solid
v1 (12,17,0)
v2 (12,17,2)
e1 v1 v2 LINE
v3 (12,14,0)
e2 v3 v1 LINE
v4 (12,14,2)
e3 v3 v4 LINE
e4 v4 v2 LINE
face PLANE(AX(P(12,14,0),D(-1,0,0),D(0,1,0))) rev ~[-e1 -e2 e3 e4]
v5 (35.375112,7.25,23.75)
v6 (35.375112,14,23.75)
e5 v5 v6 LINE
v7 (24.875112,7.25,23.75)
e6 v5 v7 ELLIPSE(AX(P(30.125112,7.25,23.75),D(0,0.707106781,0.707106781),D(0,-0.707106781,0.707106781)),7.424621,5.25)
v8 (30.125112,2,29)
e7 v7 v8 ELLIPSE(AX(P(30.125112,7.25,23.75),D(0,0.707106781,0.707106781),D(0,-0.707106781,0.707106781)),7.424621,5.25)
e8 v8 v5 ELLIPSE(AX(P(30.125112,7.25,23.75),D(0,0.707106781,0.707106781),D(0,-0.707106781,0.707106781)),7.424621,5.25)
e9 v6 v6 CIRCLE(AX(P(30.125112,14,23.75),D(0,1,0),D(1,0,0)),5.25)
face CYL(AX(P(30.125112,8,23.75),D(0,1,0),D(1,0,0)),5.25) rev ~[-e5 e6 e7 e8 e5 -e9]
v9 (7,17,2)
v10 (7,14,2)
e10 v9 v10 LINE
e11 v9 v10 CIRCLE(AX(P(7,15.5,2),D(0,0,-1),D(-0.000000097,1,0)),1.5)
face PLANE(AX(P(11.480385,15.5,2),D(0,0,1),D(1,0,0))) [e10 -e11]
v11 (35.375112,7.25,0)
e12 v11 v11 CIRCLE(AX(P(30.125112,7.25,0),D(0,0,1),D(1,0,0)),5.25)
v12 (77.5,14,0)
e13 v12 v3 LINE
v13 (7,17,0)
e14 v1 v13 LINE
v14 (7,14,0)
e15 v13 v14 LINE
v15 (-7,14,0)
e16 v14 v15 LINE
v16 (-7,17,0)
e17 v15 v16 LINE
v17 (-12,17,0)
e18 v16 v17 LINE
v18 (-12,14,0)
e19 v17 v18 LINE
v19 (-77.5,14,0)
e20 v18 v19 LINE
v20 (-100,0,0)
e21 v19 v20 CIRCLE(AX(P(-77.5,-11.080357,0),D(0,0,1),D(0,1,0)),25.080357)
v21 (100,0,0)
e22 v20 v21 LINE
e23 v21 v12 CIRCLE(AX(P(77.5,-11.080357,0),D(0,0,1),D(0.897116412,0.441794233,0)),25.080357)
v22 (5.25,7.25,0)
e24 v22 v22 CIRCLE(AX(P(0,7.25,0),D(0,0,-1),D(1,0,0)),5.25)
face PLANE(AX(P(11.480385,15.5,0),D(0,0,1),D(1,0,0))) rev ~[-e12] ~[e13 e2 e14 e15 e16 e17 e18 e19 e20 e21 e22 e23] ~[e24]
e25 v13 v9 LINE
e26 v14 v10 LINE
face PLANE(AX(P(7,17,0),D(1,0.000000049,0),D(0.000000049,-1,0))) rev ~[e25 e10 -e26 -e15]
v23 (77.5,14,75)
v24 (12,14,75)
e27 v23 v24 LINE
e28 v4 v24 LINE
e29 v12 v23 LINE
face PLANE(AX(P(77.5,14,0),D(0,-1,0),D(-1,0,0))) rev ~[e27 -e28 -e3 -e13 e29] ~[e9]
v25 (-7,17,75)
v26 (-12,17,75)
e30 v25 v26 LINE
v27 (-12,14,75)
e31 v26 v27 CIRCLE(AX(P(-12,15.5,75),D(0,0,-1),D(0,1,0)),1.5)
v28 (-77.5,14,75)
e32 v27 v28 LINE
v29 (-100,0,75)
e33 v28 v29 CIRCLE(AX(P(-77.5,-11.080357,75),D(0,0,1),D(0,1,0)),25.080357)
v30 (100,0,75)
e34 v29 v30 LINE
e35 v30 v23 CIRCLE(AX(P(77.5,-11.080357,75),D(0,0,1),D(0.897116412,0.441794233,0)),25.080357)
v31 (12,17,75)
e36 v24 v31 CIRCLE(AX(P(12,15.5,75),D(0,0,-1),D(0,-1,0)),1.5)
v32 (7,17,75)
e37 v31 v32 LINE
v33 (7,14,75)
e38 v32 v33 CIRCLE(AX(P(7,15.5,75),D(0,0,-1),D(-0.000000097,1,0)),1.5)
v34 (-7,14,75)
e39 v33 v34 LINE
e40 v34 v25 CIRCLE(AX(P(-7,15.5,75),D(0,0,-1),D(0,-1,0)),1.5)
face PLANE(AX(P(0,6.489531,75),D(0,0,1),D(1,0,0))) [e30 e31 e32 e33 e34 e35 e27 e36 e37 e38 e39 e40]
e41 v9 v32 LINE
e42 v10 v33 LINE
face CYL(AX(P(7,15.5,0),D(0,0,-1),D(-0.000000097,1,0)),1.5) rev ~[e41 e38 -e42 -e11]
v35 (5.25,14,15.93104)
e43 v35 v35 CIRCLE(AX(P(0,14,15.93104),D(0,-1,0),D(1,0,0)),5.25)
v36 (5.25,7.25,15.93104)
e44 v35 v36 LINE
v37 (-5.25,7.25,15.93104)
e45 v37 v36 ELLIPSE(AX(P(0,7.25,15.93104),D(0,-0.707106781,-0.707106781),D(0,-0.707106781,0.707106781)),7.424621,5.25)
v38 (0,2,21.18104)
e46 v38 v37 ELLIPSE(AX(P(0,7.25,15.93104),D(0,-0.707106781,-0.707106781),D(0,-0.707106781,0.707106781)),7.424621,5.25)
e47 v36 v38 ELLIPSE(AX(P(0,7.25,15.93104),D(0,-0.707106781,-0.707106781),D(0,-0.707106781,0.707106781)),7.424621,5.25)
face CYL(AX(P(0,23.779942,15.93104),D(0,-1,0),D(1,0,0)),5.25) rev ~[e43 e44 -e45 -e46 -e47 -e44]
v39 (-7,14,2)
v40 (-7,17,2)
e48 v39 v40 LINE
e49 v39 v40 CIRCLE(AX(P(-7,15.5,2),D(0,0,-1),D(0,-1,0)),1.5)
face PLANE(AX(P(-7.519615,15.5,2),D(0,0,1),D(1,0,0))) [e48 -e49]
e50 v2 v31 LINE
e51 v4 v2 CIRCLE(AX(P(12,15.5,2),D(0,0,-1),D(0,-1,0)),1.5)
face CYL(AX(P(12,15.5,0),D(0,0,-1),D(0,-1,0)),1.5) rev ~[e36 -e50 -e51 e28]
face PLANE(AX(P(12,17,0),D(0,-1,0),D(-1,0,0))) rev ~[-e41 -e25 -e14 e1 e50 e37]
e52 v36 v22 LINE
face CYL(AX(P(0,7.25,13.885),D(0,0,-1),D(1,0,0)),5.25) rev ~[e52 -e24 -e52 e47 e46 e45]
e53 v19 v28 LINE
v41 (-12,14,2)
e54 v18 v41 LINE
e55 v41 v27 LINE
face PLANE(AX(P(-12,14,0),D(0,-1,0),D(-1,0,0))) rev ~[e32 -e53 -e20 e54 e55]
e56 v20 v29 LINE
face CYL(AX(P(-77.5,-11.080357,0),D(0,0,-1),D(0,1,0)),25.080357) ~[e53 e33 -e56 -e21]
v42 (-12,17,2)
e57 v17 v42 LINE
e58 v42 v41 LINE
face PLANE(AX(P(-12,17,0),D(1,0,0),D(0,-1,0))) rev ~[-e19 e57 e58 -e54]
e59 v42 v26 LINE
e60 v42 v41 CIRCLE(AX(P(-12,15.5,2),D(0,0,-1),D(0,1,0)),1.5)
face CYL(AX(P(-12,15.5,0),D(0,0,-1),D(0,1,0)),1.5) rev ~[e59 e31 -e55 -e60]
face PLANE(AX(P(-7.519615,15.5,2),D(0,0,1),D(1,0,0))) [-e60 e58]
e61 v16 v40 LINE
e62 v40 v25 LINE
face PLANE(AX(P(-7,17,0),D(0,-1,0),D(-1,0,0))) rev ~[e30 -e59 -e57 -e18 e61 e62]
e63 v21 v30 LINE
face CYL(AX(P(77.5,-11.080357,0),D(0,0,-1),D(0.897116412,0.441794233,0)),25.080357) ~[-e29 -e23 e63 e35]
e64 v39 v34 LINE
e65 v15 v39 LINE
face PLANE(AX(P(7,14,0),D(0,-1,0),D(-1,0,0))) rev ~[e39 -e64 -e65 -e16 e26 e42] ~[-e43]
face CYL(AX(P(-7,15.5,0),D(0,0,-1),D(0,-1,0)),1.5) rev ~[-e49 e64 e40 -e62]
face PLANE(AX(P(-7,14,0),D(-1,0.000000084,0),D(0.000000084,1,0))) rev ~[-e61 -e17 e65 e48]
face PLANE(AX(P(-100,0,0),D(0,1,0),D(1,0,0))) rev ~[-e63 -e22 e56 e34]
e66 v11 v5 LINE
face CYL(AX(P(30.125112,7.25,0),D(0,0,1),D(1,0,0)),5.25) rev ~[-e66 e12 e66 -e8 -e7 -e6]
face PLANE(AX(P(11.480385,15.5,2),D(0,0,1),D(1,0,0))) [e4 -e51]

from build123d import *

# Parameters (mm, degrees)
F0_R     = 5.25
F1_DEPTH = 75
F4_DEPTH = 2


# Not quite as in the source:
# - a feature names something its author has since deleted; it is built from what else it names


with BuildPart() as f1:
    # F0 (on Top) → F1 (new body)
    with BuildSketch(Plane.XY):
        with BuildLine():
            Line((-100, 0), (-13.8524602948, 0))
            Line((-13.8524602948, 0), (12.09906023, 0))
            Line((12.09906023, 0), (100, 0))
            ThreePointArc((100, 0), (90.75, 10.2142857143), (77.5, 14))
            Line((77.5, 14), (32.5911540906, 14))
            Line((32.5911540906, 14), (26.9999997473, 14))
            Line((26.9999997473, 14), (11.9999997473, 14))
            Line((11.9999997473, 14), (7, 14))
            Line((7, 14), (-7, 14))
            Line((-7, 14), (-11.9999997473, 14))
            Line((-11.9999997473, 14), (-77.5, 14))
            ThreePointArc((-77.5, 14), (-90.75, 10.2142857143), (-100, 0))
        make_face()
        with Locations((0, 7.25)):
            Circle(F0_R, mode=Mode.SUBTRACT)
        with Locations((30.1251118069, 7.25)):
            Circle(F0_R, mode=Mode.SUBTRACT)
        with Locations((30.1251118069, 7.25)):
            Circle(F0_R)
        with BuildLine():
            ThreePointArc((-11.9999997473, 17), (-10.4999997473, 15.5), (-11.9999997473, 14))
            Line((-11.9999997473, 14), (-7, 14))
            ThreePointArc((-7, 14), (-8.5, 15.5000001263), (-6.9999997473, 17))
            Line((-6.9999997473, 17), (-11.9999997473, 17))
        make_face()
        with BuildLine():
            ThreePointArc((6.9999998542, 17), (8.5, 15.5000000729), (7, 14))
            Line((7, 14), (11.9999997473, 14))
            ThreePointArc((11.9999997473, 14), (10.4999997473, 15.5), (11.9999997473, 17))
            Line((11.9999997473, 17), (6.9999998542, 17))
        make_face()
        with Locations((0, 7.25)):
            Circle(F0_R)
    extrude(amount=F1_DEPTH)

    # F0 (on Top) → F4 (join)
    with BuildSketch(Plane.XY):
        with BuildLine():
            ThreePointArc((11.9999997473, 17), (10.4999997473, 15.5), (11.9999997473, 14))
            Line((11.9999997473, 14), (11.9999997473, 17))
        make_face()
        with BuildLine():
            Line((6.9999998542, 17), (7, 14))
            ThreePointArc((7, 14), (8.5, 15.5000000729), (6.9999998542, 17))
        make_face()
        with BuildLine():
            ThreePointArc((-6.9999997473, 17), (-8.5, 15.5000001263), (-7, 14))
            Line((-7, 14), (-6.9999997473, 17))
        make_face()
        with BuildLine():
            Line((-11.9999997473, 17), (-11.9999997473, 14))
            ThreePointArc((-11.9999997473, 14), (-10.4999997473, 15.5), (-11.9999997473, 17))
        make_face()
        with BuildLine():
            ThreePointArc((-11.9999997473, 17), (-10.4999997473, 15.5), (-11.9999997473, 14))
            Line((-11.9999997473, 14), (-7, 14))
            ThreePointArc((-7, 14), (-8.5, 15.5000001263), (-6.9999997473, 17))
            Line((-6.9999997473, 17), (-11.9999997473, 17))
        make_face()
        with BuildLine():
            ThreePointArc((6.9999998542, 17), (8.5, 15.5000000729), (7, 14))
            Line((7, 14), (11.9999997473, 14))
            ThreePointArc((11.9999997473, 14), (10.4999997473, 15.5), (11.9999997473, 17))
            Line((11.9999997473, 17), (6.9999998542, 17))
        make_face()
    extrude(amount=F4_DEPTH)

    # F5: sweep along a path in F3
    with BuildLine(Plane.YZ.offset(30.1251118069)) as f5_path:
        Line((8, 0), (8, 23))
        Line((8, 23), (14, 23))
    # F0 (on Top) → F5 (sweep, cut)
    with BuildSketch(Plane.XY):
        with Locations((30.1251118069, 7.25)):
            Circle(F0_R)
    sweep(path=f5_path.line, transition=Transition.RIGHT, mode=Mode.SUBTRACT)

    # F7: sweep along a path in F6
    with BuildLine(Plane.YZ) as f7_path:
        Line((23.7799418298, 13.885), (9.2960403562, 13.885))
        Line((9.2960403562, 13.885), (9.2960403562, 0))
    # F0 (on Top) → F7 (sweep, cut)
    with BuildSketch(Plane.XY):
        with Locations((0, 7.25)):
            Circle(F0_R)
    sweep(path=f7_path.line, transition=Transition.RIGHT, mode=Mode.SUBTRACT)


solid = f1.part
